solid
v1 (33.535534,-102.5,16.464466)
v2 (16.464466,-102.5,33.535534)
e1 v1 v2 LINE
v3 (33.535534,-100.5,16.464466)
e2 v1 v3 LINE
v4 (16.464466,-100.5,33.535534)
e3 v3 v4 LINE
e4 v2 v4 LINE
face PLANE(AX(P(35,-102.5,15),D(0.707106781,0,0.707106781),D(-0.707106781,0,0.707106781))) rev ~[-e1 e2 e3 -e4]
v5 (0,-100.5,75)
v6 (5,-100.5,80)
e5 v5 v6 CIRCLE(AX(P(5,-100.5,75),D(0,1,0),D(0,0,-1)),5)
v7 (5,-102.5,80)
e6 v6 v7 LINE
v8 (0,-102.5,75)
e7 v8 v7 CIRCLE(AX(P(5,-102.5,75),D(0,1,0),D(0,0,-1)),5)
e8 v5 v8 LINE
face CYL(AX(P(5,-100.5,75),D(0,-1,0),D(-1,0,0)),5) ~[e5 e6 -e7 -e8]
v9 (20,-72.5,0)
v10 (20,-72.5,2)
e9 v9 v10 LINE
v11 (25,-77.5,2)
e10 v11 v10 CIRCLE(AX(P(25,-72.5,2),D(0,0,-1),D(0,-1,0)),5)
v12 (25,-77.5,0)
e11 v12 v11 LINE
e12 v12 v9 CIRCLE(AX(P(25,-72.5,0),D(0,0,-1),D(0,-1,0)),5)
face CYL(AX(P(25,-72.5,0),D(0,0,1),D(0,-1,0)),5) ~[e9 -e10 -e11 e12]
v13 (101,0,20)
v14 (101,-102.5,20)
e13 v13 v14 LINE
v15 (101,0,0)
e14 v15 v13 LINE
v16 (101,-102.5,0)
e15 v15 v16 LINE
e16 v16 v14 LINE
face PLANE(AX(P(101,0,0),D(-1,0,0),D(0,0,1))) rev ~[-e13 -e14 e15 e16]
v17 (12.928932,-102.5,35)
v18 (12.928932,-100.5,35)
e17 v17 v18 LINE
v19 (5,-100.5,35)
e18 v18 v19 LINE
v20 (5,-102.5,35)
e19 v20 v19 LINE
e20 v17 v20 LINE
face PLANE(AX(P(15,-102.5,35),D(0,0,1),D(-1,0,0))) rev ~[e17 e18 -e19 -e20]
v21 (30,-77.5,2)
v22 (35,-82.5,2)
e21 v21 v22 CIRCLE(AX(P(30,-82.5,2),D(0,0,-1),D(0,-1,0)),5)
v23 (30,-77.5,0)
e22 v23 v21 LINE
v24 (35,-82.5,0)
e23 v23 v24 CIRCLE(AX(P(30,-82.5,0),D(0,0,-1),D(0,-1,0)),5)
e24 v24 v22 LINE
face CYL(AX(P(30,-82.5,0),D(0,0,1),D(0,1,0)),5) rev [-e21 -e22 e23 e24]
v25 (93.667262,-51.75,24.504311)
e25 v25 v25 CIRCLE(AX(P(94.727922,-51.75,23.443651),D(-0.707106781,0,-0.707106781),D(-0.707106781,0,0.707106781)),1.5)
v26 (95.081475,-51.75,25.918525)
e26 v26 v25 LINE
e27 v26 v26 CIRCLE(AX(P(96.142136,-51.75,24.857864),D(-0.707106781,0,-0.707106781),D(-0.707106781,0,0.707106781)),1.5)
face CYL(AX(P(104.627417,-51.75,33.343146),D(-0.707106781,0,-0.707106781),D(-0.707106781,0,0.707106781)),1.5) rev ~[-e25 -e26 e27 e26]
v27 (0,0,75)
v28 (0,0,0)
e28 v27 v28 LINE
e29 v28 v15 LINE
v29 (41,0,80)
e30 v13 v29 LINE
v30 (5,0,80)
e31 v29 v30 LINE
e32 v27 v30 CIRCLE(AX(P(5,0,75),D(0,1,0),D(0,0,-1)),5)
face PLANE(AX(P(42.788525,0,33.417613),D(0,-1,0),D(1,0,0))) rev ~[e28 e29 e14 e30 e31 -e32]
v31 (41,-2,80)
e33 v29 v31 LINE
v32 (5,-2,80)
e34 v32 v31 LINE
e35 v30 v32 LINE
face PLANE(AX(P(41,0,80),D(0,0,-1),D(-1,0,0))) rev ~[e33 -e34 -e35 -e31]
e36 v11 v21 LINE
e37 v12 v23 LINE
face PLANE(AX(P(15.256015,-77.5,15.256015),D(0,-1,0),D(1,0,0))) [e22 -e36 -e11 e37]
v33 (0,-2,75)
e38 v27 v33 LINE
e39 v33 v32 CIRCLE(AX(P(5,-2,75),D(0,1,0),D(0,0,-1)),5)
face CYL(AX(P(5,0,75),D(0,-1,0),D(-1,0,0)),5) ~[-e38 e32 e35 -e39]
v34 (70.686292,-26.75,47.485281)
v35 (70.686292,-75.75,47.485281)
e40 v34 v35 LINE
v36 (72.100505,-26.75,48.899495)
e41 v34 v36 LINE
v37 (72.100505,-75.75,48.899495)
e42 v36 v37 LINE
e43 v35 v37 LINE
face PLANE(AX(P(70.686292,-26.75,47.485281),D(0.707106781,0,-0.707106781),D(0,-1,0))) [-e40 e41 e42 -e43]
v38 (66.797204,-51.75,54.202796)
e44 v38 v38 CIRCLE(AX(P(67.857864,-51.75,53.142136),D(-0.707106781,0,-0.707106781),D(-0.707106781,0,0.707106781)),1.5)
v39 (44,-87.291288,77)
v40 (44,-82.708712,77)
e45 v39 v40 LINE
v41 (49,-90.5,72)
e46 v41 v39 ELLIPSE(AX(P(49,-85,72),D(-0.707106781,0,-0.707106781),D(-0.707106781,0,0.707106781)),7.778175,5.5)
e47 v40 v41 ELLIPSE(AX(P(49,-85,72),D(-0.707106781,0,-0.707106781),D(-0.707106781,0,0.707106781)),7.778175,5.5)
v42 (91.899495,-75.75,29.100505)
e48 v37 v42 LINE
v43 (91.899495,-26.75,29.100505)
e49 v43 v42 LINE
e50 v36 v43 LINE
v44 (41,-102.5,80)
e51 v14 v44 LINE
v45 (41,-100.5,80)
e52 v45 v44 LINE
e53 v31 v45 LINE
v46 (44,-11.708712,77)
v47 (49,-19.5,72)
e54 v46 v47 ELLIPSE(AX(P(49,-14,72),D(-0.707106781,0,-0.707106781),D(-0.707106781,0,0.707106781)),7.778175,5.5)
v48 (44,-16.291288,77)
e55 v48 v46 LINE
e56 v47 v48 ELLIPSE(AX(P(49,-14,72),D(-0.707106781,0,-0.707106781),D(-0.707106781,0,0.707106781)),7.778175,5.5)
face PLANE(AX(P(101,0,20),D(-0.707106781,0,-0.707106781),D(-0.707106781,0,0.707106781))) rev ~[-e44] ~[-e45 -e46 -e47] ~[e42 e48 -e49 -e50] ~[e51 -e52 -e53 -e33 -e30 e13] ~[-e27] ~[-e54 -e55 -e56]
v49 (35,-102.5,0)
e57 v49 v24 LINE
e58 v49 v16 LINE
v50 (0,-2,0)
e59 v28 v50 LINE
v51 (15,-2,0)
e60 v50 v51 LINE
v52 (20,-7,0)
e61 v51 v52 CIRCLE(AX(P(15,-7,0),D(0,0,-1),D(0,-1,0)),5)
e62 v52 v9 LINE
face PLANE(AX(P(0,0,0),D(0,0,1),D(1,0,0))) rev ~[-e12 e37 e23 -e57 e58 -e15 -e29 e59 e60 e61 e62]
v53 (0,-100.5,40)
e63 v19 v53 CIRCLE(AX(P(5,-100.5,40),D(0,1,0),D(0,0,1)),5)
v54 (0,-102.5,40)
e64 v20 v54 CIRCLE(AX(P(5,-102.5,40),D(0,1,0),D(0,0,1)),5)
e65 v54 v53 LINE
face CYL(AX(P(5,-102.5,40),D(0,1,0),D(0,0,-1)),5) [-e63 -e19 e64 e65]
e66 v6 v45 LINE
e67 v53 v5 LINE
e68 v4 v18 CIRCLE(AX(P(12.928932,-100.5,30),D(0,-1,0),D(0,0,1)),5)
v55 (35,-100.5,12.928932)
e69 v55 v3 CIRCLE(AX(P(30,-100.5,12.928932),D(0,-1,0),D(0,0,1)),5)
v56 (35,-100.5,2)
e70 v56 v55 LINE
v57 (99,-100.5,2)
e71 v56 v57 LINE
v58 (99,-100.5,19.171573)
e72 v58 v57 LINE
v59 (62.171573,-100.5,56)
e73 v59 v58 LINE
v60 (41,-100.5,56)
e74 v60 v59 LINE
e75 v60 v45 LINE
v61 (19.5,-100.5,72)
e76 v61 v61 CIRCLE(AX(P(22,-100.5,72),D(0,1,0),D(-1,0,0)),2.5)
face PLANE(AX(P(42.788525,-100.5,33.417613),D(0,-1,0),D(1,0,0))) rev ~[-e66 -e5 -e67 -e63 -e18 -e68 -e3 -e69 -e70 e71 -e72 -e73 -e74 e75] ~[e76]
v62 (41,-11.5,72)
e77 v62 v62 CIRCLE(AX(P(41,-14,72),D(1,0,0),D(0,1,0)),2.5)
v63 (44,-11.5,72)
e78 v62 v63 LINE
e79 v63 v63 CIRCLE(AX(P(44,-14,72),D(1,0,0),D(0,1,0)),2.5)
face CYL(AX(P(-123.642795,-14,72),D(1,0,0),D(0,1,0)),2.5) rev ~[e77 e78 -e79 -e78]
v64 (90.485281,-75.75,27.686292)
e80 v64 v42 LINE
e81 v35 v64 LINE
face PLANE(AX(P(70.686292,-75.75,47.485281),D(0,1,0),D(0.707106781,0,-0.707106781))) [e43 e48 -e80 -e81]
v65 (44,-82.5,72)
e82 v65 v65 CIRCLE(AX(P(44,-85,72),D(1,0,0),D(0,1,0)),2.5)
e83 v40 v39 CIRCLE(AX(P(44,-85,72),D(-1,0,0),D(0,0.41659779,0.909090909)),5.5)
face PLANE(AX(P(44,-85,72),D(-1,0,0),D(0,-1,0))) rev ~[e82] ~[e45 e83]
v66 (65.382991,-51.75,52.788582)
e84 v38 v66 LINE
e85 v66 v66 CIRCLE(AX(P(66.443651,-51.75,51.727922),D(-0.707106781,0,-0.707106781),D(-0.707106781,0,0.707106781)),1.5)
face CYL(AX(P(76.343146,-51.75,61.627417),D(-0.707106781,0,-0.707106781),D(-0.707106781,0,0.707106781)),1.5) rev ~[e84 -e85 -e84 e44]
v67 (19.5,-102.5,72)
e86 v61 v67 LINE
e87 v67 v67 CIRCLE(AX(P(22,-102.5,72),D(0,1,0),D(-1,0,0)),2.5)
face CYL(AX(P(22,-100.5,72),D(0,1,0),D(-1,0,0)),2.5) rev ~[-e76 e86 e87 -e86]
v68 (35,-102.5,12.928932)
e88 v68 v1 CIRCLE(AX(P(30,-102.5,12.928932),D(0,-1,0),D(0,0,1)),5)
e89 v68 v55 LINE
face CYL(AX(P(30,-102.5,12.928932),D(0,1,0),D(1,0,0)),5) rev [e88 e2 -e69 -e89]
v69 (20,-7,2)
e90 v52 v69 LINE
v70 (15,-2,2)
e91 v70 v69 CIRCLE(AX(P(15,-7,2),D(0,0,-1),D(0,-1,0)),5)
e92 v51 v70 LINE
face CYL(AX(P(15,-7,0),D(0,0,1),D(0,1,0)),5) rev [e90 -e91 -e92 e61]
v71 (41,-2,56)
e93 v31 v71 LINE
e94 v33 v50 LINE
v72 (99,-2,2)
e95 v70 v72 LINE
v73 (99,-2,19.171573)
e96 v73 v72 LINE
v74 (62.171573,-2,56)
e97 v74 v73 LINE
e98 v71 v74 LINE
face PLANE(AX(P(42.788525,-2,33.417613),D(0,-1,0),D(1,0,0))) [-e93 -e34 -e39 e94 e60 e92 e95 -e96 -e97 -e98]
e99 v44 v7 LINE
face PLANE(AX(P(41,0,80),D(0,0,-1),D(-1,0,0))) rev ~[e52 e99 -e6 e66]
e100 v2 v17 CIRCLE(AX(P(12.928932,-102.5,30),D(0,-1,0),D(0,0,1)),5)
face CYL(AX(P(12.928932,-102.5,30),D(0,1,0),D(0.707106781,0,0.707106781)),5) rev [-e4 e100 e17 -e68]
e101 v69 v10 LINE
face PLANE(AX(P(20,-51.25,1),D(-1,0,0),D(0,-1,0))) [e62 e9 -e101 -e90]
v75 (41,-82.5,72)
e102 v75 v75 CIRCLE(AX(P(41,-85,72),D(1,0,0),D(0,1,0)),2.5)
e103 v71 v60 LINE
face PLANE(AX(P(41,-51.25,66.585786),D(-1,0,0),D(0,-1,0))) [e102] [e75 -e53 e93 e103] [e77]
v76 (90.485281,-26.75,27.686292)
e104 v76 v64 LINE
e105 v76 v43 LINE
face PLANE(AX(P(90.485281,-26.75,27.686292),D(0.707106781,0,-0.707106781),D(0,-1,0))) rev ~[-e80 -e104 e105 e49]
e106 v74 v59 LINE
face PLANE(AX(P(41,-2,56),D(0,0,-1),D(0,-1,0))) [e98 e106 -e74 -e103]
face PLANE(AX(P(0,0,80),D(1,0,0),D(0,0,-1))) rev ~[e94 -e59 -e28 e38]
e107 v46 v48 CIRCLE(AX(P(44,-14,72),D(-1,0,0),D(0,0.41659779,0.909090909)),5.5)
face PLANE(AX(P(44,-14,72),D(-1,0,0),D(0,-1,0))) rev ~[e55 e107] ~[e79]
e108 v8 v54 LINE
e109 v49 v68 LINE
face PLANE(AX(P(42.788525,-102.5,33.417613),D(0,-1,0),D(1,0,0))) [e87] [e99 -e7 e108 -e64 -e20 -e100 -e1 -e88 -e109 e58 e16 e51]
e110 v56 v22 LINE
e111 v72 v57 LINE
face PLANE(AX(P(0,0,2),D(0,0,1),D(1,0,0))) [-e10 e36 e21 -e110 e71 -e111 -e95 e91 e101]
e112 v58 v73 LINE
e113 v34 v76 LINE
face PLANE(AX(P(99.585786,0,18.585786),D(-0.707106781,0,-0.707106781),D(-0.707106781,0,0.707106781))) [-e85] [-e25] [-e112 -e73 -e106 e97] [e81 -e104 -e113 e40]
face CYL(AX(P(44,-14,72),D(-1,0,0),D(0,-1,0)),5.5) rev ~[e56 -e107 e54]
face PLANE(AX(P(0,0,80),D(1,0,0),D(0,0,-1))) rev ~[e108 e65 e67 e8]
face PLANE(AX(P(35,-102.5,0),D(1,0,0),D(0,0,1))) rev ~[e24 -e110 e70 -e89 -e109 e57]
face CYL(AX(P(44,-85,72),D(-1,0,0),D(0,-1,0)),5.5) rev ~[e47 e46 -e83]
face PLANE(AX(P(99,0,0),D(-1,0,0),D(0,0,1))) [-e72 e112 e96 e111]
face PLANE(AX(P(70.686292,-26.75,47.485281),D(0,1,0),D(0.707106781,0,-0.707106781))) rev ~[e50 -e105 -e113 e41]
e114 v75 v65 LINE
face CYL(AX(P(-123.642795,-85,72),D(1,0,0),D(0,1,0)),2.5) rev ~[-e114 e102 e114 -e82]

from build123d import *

# Parameters (mm, degrees)
F1_DEPTH  = 102.5
F2_T      = -2
F3_W      = 41
F3_H      = 98.5
F4_DEPTH  = 78.001
F5_W      = 98.5
F5_H      = 21.1715728753
F8_D      = 5
F9_W      = 28
F9_H      = 49
F10_DEPTH = 44.4274068712
F12_D     = 5
F12_DEPTH = 2.001
F14_D     = 3
F14_DEPTH = 12
F14_TIP   = 0.9012909285
F15_W     = 98.5
F15_H     = 2
F16_DEPTH = 20
F18_DEPTH = 25
F20_R     = 5.5
F21_DEPTH = 25
F22_R     = 5


with BuildPart() as f1:
    # F0 (on Front) → F1 (new body)
    with BuildSketch(Plane.XZ):
        Polygon((0, 80), (0, 0), (101, 0), (101, 20), (41, 80), align=None)
    extrude(amount=F1_DEPTH)

    # F2
    f2_openings = [f1.faces().sort_by_distance(p)[0] for p in [
        (0, -51.25, 40),
        (20.5, -51.25, 80),
    ]]
    offset(amount=F2_T, openings=f2_openings)

    # F3 (on face) → F4 (cut, through all)
    with BuildSketch(Plane.XY.offset(2)):
        with Locations((20.5, -51.25)):
            Rectangle(F3_W, F3_H)
    extrude(amount=F4_DEPTH, mode=Mode.SUBTRACT)

    # F5 (on face) → F6 (join, up to the last surface of F1)
    with BuildSketch(Plane(origin=(41, 0, 0), x_dir=(0, -1, 0), z_dir=(-1, 0, 0))):
        with Locations((51.25, 66.5857864376)):
            Rectangle(F5_W, F5_H)
    extrude(until=Until.LAST, dir=(1, 0, 0))

    # F8 (through all)
    with Locations(Plane(origin=(41, 0, 0), x_dir=(0, -1, 0), z_dir=(-1, 0, 0))):
        with Locations((85, 72), (14, 72)):
            Hole(F8_D / 2)

    # F9 (on face) → F10 (cut, through all)
    with BuildSketch(Plane(origin=(59.0857864376, 0, 59.0857864376), x_dir=(0.7071067812, 0, -0.7071067812), z_dir=(-0.7071067812, 0, -0.7071067812))):
        with Locations((30.405591591, 51.25)):
            Rectangle(F9_W, F9_H)
    extrude(amount=-F10_DEPTH, mode=Mode.SUBTRACT)

    # F12 (through all, one way)
    with BuildSketch(Plane(origin=(0, -100.5, 0), x_dir=(-1, 0, 0), z_dir=(0, 1, 0))):
        with Locations((-22, 72)):
            Circle(F12_D / 2)
    extrude(amount=-F12_DEPTH, mode=Mode.SUBTRACT)

    # F14
    with Locations(Plane(origin=(60.5, 0, 60.5), x_dir=(0.7071067812, 0, -0.7071067812), z_dir=(0.7071067812, 0, 0.7071067812))):
        with Locations((10.405591591, -51.75), (50.405591591, -51.75)):
            Hole(F14_D / 2, depth=F14_DEPTH)
            with Locations((0, 0, -(F14_DEPTH + F14_TIP / 2))):  # 118° drill point
                Cone(0, F14_D / 2, F14_TIP, mode=Mode.SUBTRACT)

    # F15 (on face) → F16 (cut)
    with BuildSketch(Plane(origin=(0, 0, 0), x_dir=(0, -1, 0), z_dir=(-1, 0, 0))):
        with Locations((51.25, 1)):
            Rectangle(F15_W, F15_H)
    extrude(amount=-F16_DEPTH, mode=Mode.SUBTRACT)

    # F17 (on face) → F18 (cut)
    with BuildSketch(Plane.XZ.offset(102.5)):
        Polygon((0, 35), (0, 0), (35, 0), (35, 15), (15, 35), align=None)
    extrude(amount=-F18_DEPTH, mode=Mode.SUBTRACT)

    # F20 (on offset) → F21 (cut)
    with BuildSketch(Plane(origin=(44, 0, 0), x_dir=(0, -1, 0), z_dir=(-1, 0, 0))):
        with Locations((85, 72)):
            Circle(F20_R)
        with Locations((14, 72)):
            Circle(F20_R)
    extrude(amount=-F21_DEPTH, mode=Mode.SUBTRACT)

    # F22
    f22_edges = [f1.edges().sort_by_distance(p)[0] for p in [
        (35, -77.5, 1),
        (35, -101.5, 15),
        (15, -101.5, 35),
        (20, -77.5, 1),
        (20, -2, 1),
        (0, -1, 80),
        (0, -101.5, 80),
        (0, -101.5, 35),
    ]]
    fillet(f22_edges, radius=F22_R)


solid = f1.part
